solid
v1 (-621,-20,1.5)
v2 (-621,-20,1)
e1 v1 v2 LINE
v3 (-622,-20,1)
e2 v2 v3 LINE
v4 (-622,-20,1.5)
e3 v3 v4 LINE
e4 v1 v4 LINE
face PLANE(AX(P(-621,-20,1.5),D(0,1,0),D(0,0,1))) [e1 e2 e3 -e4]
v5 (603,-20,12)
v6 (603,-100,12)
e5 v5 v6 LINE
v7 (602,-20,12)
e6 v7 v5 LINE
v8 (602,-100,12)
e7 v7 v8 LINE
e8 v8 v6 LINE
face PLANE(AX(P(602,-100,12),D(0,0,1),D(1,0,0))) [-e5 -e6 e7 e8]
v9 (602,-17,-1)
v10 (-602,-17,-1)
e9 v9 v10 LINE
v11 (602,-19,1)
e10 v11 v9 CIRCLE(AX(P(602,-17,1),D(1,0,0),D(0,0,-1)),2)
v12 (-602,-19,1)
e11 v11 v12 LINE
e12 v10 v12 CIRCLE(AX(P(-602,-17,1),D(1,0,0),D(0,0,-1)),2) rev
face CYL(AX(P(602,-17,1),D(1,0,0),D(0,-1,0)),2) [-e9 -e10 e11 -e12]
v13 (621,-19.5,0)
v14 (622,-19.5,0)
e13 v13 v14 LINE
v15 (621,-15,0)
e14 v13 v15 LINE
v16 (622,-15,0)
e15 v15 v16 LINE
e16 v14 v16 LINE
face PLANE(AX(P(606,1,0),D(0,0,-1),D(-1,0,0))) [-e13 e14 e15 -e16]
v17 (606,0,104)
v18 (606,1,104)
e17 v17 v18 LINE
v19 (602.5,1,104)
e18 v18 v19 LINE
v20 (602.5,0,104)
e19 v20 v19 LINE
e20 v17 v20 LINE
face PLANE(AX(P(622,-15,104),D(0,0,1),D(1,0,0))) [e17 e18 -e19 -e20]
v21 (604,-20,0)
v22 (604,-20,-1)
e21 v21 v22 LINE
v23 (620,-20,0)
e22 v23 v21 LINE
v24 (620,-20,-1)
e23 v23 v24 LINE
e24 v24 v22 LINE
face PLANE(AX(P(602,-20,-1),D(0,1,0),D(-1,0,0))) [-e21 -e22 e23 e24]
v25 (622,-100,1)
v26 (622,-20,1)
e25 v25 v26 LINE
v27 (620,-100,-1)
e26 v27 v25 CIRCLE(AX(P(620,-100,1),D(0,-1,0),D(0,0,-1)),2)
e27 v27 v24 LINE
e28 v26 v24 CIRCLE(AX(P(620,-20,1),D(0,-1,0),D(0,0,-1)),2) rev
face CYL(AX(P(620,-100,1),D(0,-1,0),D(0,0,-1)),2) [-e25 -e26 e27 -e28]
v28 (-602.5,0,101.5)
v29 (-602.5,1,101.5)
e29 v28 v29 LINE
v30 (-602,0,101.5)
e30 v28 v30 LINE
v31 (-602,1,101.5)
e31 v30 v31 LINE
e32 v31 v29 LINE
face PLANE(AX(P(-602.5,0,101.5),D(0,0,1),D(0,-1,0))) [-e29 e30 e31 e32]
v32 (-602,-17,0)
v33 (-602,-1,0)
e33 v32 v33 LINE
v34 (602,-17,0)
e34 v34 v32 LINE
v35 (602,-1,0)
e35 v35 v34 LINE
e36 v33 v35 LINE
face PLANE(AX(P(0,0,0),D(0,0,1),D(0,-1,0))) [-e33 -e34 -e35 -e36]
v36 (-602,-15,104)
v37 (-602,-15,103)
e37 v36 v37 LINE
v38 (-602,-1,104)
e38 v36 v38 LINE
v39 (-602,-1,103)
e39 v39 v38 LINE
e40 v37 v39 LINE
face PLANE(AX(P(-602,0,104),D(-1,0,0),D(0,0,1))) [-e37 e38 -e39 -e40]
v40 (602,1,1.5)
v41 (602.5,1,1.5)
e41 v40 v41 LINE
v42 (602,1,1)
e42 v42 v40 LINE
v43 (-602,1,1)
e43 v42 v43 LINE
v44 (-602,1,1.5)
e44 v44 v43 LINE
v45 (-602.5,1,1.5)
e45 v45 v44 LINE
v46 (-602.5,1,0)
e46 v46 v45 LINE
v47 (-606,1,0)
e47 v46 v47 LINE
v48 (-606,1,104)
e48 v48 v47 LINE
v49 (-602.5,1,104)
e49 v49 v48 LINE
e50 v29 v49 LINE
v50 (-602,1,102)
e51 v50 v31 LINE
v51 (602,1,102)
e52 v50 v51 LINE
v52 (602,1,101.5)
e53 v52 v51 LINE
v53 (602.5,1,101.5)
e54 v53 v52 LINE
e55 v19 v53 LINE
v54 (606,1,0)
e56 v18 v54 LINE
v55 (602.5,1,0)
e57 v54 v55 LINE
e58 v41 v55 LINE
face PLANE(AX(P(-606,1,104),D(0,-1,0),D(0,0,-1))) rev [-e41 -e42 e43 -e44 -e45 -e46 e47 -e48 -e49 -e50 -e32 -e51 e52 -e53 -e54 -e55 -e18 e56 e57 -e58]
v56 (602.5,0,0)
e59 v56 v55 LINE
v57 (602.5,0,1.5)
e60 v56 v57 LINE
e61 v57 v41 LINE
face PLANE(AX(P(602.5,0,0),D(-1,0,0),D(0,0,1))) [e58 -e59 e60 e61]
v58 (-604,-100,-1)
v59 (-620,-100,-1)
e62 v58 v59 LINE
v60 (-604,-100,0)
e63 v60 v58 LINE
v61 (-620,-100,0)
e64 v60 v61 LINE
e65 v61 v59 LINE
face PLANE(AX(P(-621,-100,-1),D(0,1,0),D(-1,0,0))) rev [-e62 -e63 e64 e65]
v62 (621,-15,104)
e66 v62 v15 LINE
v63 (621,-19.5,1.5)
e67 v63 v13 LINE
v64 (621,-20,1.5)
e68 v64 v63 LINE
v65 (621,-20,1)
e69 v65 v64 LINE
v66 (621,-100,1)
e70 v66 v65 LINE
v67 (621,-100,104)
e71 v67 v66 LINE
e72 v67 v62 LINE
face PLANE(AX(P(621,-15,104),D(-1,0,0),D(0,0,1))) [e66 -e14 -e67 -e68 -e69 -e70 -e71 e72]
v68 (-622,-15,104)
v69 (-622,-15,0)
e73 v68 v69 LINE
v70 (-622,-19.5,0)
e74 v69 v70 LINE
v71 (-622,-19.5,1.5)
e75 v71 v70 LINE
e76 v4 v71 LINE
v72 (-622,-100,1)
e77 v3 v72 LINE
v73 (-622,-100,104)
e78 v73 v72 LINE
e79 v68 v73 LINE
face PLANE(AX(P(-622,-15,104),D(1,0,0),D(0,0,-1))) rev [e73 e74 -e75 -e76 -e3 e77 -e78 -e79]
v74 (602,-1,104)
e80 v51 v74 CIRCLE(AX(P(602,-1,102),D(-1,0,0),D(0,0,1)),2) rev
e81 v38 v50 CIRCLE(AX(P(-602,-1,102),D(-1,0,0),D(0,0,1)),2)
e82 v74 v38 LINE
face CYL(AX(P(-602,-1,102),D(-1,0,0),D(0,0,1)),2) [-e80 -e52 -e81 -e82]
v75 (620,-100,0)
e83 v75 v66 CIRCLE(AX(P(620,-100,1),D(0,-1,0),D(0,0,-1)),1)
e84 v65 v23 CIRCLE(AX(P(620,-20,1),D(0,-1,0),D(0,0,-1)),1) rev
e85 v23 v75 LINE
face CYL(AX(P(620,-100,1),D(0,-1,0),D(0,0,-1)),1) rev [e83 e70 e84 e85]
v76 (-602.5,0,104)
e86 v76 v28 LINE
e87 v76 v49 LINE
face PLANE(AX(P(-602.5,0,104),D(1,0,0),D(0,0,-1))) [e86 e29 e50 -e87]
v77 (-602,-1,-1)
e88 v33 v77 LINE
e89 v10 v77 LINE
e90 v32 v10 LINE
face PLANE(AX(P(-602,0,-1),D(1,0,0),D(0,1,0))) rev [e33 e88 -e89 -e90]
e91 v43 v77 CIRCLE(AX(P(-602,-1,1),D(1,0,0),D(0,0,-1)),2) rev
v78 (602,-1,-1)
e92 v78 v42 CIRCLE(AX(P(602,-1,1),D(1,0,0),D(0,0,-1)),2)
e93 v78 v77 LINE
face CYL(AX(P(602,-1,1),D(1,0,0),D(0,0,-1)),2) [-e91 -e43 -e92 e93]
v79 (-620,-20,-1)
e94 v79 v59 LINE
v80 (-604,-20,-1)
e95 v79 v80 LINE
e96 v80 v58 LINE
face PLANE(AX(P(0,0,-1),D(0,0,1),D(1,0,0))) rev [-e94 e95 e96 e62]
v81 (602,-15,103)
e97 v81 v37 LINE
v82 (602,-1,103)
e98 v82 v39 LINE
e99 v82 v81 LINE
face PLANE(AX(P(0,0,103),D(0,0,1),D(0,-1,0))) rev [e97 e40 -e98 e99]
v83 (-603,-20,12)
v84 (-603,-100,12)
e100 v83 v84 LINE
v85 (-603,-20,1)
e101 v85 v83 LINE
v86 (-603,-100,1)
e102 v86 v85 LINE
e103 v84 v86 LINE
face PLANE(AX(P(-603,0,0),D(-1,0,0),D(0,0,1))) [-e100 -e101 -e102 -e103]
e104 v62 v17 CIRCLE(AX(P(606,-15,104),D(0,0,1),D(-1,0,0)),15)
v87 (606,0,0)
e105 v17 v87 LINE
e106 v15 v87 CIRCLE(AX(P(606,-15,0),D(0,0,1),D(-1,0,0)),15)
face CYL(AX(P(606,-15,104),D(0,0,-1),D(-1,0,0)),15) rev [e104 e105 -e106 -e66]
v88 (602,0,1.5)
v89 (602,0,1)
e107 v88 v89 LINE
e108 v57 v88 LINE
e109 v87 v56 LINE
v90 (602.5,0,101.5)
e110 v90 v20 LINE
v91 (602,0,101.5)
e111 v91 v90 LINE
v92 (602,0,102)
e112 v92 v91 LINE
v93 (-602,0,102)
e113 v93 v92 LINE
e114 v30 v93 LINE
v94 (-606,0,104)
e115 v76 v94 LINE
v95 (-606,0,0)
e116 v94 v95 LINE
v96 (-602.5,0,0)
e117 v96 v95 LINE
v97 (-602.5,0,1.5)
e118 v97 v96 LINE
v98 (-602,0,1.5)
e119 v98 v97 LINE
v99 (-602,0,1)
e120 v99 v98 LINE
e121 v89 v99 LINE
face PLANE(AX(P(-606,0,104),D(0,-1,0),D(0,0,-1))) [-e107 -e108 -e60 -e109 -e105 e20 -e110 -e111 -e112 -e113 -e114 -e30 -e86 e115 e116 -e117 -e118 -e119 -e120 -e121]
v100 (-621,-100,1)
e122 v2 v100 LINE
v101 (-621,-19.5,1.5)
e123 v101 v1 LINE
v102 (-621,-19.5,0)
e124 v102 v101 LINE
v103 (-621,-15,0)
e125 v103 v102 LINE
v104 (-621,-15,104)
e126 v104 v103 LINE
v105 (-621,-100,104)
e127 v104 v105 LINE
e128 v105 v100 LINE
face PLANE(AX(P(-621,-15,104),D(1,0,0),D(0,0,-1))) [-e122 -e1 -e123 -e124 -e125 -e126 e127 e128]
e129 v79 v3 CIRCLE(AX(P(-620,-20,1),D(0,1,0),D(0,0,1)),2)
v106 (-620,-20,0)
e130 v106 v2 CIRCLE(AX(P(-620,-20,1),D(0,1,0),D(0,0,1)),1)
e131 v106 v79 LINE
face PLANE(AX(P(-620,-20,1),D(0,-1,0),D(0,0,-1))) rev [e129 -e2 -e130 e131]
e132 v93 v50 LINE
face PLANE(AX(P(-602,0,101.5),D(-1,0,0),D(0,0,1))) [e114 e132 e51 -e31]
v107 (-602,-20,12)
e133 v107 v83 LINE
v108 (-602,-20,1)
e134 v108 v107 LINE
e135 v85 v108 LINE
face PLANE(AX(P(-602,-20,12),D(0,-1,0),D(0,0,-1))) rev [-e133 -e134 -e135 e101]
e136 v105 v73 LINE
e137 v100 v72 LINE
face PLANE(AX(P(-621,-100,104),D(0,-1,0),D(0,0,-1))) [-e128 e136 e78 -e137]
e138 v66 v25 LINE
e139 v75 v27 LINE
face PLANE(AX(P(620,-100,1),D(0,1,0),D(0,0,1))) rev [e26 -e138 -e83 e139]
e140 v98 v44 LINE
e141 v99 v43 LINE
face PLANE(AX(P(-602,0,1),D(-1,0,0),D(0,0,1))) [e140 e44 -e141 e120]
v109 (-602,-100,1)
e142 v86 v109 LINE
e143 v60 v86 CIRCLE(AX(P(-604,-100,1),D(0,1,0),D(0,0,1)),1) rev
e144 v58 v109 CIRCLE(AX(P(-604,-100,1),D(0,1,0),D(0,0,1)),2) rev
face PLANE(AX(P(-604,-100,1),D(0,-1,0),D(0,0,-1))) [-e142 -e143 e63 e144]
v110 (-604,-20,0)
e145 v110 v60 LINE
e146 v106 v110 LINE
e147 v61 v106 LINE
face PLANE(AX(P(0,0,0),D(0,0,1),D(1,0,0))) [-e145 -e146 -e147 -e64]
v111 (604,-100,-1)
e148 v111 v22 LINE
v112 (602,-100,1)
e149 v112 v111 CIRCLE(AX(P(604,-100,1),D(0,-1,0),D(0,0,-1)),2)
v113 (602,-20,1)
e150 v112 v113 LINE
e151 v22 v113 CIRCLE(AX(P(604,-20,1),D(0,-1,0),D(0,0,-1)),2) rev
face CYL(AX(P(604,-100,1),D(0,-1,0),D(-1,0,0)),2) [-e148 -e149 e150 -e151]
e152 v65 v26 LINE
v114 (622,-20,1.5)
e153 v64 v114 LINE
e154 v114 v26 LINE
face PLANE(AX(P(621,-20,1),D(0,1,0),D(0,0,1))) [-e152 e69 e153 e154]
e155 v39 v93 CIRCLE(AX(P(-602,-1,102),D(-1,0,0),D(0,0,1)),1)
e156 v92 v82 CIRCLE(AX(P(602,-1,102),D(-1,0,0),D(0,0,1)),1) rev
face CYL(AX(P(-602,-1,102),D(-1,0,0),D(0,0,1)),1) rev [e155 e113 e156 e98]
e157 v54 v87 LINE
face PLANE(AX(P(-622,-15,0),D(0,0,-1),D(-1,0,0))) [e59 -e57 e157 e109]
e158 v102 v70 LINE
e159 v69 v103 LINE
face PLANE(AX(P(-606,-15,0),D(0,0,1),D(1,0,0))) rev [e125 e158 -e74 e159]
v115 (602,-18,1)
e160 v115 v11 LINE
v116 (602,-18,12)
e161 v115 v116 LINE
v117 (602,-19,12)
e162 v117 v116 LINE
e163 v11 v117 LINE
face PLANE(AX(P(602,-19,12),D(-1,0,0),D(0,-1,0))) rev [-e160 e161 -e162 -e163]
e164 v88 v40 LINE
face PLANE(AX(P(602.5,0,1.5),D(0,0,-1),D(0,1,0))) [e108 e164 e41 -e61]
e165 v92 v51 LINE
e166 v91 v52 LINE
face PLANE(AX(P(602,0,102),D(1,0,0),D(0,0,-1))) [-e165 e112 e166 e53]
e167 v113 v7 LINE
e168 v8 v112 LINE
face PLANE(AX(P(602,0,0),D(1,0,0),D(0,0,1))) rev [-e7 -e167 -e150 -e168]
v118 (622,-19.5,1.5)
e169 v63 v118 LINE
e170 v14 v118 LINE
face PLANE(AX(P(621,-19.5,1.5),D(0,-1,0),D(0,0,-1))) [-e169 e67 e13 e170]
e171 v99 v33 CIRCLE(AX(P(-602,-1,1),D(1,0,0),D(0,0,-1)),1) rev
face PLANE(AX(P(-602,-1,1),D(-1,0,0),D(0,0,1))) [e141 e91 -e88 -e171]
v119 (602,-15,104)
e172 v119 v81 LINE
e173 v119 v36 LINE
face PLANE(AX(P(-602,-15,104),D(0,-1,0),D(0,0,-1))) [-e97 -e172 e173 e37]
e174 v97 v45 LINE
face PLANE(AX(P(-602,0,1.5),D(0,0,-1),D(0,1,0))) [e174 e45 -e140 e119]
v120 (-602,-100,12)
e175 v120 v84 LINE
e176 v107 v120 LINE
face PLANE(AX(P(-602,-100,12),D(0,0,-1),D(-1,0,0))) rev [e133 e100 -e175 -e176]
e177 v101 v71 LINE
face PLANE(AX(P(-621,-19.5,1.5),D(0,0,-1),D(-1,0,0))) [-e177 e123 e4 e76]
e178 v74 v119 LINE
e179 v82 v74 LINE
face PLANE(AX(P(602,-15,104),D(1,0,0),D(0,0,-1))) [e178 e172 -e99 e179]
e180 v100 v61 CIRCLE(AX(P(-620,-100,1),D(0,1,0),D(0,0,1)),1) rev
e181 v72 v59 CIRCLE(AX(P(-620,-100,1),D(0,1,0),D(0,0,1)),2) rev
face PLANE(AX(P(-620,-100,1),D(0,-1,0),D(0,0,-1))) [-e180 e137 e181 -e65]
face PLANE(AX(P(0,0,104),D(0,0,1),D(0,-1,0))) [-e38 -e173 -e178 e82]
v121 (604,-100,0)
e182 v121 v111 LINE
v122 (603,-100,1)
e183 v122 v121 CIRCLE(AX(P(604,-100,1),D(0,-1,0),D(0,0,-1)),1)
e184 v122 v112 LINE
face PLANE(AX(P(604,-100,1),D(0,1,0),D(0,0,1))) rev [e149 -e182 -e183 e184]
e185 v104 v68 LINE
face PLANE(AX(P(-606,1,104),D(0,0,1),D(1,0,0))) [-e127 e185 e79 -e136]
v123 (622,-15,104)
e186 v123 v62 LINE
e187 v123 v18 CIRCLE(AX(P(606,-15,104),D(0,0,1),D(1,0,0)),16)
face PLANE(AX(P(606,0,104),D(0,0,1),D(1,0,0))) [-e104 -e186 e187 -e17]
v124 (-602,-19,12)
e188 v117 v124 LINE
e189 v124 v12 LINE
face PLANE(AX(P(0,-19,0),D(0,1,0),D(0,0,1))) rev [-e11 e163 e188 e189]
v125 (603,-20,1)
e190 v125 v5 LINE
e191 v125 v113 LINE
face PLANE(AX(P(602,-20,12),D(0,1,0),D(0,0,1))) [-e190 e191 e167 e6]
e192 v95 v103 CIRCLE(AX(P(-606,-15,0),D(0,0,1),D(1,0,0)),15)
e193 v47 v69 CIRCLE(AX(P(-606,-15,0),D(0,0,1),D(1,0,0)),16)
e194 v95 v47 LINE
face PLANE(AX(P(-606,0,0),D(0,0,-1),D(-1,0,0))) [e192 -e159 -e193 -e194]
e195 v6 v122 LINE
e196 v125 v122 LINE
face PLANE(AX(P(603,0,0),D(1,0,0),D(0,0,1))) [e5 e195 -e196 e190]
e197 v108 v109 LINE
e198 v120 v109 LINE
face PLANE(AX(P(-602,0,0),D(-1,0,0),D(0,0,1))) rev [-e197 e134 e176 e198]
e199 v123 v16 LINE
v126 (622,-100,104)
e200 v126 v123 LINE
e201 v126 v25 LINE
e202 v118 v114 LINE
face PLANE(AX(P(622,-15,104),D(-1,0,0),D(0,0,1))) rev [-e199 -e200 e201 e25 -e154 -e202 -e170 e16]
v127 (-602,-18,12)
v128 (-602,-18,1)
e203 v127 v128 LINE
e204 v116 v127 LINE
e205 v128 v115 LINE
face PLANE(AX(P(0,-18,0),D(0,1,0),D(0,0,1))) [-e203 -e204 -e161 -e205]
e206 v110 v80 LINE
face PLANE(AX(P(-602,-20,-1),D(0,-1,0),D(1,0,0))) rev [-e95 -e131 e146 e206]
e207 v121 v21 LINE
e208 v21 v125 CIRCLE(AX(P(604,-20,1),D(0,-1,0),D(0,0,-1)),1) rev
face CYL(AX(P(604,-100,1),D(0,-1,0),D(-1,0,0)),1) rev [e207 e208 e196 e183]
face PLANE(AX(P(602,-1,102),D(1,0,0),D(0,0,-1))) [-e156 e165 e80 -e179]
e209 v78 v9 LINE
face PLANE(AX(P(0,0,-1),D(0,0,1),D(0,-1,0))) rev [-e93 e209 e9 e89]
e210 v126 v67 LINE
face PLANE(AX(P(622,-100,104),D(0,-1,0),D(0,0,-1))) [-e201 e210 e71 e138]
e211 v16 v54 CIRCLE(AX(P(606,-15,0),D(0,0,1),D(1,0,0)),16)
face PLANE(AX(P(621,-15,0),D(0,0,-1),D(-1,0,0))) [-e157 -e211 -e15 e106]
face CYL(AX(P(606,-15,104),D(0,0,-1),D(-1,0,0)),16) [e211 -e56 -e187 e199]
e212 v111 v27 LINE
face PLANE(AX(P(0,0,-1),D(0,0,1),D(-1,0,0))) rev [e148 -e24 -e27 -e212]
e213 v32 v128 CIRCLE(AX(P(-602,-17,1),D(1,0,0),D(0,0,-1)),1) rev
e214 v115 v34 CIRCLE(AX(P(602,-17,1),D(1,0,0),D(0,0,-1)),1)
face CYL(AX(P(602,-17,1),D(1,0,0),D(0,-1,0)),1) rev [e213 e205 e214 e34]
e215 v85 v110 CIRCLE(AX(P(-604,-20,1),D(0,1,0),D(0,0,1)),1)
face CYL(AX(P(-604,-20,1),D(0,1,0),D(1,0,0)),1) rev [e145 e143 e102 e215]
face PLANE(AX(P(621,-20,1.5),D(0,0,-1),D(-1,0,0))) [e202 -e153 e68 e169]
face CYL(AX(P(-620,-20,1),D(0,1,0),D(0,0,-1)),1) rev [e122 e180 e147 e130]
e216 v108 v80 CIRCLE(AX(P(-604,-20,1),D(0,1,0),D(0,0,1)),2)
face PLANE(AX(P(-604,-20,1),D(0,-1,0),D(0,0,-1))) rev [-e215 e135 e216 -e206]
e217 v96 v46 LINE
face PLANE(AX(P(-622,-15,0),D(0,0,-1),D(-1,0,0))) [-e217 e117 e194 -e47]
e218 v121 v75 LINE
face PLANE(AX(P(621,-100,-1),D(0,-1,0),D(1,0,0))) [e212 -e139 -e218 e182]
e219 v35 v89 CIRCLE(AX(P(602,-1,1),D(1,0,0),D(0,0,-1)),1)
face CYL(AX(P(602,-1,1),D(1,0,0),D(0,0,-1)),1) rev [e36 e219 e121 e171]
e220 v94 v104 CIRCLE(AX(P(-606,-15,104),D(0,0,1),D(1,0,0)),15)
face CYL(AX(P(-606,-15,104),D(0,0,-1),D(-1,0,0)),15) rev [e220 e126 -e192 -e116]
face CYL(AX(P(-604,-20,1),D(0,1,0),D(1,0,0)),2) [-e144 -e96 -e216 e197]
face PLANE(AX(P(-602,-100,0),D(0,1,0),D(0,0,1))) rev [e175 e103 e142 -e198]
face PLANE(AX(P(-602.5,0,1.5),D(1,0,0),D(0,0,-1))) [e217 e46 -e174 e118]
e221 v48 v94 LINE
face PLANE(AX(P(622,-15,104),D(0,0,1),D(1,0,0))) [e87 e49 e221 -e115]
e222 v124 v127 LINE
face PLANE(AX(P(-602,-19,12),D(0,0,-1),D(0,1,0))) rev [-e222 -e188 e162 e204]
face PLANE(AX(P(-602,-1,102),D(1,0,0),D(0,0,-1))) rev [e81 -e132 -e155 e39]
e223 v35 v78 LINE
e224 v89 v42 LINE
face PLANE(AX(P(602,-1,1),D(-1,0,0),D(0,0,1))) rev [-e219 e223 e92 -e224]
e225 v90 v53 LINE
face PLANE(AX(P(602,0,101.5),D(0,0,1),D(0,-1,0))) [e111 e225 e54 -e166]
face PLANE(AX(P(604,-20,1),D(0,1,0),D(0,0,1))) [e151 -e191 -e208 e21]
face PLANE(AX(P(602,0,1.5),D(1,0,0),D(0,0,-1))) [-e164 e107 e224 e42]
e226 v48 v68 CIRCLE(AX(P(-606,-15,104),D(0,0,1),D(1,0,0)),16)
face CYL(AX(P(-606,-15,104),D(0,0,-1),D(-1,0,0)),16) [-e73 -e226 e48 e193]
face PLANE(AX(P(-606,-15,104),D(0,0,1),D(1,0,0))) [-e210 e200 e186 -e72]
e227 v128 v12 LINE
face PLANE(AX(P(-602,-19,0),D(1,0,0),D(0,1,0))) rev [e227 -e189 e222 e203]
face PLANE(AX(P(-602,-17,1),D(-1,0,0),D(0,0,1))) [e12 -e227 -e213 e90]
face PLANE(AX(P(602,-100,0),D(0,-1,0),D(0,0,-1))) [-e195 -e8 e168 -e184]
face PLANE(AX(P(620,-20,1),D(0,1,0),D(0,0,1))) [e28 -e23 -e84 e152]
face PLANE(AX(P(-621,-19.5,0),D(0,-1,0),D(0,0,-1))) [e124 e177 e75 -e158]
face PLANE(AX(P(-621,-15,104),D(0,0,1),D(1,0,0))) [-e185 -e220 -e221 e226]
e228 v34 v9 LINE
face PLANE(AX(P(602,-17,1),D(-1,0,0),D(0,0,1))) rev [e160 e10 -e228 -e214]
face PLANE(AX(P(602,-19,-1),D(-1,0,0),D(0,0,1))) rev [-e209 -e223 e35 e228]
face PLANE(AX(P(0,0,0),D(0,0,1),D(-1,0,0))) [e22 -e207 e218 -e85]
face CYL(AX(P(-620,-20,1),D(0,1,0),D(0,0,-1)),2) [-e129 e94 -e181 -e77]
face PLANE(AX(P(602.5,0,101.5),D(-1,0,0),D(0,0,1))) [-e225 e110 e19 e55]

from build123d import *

# Parameters (mm, degrees)
BASE_FLANGE1_DEPTH            = 104
EDGE_FLANGE1_STRIP_W          = 6
EDGE_FLANGE1_STRIP_H          = 1
EDGE_FLANGE1_STRIP_CUT_DEPTH  = 1204
EDGE_FLANGE1_RELIEF_W         = 6.5
EDGE_FLANGE1_RELIEF_H         = 0.5
EDGE_FLANGE1_RELIEF_CUT_DEPTH = 1
EDGE_FLANGE1_DEPTH            = 1204
EDGE_FLANGE2_STRIP_W          = 6
EDGE_FLANGE2_STRIP_H          = 1
EDGE_FLANGE2_STRIP_CUT_DEPTH  = 1204
EDGE_FLANGE2_DEPTH            = 1204
EDGE_FLANGE3_STRIP_W          = 6
EDGE_FLANGE3_STRIP_H          = 1
EDGE_FLANGE3_STRIP_CUT_DEPTH  = 80
EDGE_FLANGE3_RELIEF_W         = 6.5
EDGE_FLANGE3_RELIEF_H         = 0.5
EDGE_FLANGE3_RELIEF_CUT_DEPTH = 1
EDGE_FLANGE3_DEPTH            = 80
EDGE_FLANGE4_STRIP_W          = 6
EDGE_FLANGE4_STRIP_H          = 1
EDGE_FLANGE4_STRIP_CUT_DEPTH  = 80
EDGE_FLANGE4_DEPTH            = 80
EDGE_FLANGE5_STRIP_W          = 6
EDGE_FLANGE5_STRIP_H          = 1
EDGE_FLANGE5_STRIP_CUT_DEPTH  = 1204
EDGE_FLANGE5_RELIEF_W         = 6.5
EDGE_FLANGE5_RELIEF_H         = 0.5
EDGE_FLANGE5_RELIEF_CUT_DEPTH = 1
EDGE_FLANGE5_DEPTH            = 1204


# Sheet-metal steps are written as plain solids
with BuildPart() as part:
    # Sketch1 → Base-Flange1 (new body)
    with BuildSketch(Plane.XY):
        with BuildLine():
            Line((-621, -100), (-621, -15))
            ThreePointArc((-621, -15), (-616.606601718, -4.393398282), (-606, 0))
            Line((-606, 0), (606, 0))
            ThreePointArc((606, 0), (616.606601718, -4.393398282), (621, -15))
            Line((621, -15), (621, -100))
            Line((621, -100), (622, -100))
            Line((622, -100), (622, -15))
            ThreePointArc((622, -15), (617.313708499, -3.686291501), (606, 1))
            Line((606, 1), (-606, 1))
            ThreePointArc((-606, 1), (-617.313708499, -3.686291501), (-622, -15))
            Line((-622, -15), (-622, -100))
            Line((-622, -100), (-621, -100))
        make_face()
    extrude(amount=BASE_FLANGE1_DEPTH)

    # Edge-Flange1 strip (across the edge) → Edge-Flange1 strip cut (cut)
    with BuildSketch(Plane(origin=(-602, 0, 0), x_dir=(0, 0, 1), z_dir=(1, 0, 0))):
        with Locations((-2, -0.5)):
            Rectangle(EDGE_FLANGE1_STRIP_W, EDGE_FLANGE1_STRIP_H)
    extrude(amount=EDGE_FLANGE1_STRIP_CUT_DEPTH, mode=Mode.SUBTRACT)

    # Edge-Flange1 relief (on the sheet) → Edge-Flange1 relief cut (cut)
    with BuildSketch(Plane(origin=(-602, 0, 1), x_dir=(0, 0, 1), z_dir=(0, -1, 0))):
        with Locations((-2.75, 0.25)):
            Rectangle(EDGE_FLANGE1_RELIEF_W, EDGE_FLANGE1_RELIEF_H)
        with Locations((-2.75, -1204.25)):
            Rectangle(EDGE_FLANGE1_RELIEF_W, EDGE_FLANGE1_RELIEF_H)
    extrude(amount=-EDGE_FLANGE1_RELIEF_CUT_DEPTH, mode=Mode.SUBTRACT)

    # Edge-Flange1 section (across the edge) → Edge-Flange1 (add)
    with BuildSketch(Plane(origin=(-602, 0, 0), x_dir=(0, 0, 1), z_dir=(1, 0, 0))):
        with BuildLine():
            Line((-1, 1), (-1, 19))
            Line((-1, 19), (0, 19))
            Line((0, 19), (0, 1))
            ThreePointArc((0, 1), (0.292893219, 0.292893219), (1, 0))
            Line((1, 0), (1, -1))
            ThreePointArc((1, -1), (-0.414213562, -0.414213562), (-1, 1))
        make_face()
    extrude(amount=EDGE_FLANGE1_DEPTH)

    # Edge-Flange2 strip (across the edge) → Edge-Flange2 strip cut (cut)
    with BuildSketch(Plane(origin=(-602, -19, 0), x_dir=(0, 1, 0), z_dir=(1, 0, 0))):
        with Locations((-1, -0.5)):
            Rectangle(EDGE_FLANGE2_STRIP_W, EDGE_FLANGE2_STRIP_H)
    extrude(amount=EDGE_FLANGE2_STRIP_CUT_DEPTH, mode=Mode.SUBTRACT)

    # Edge-Flange2 section (across the edge) → Edge-Flange2 (add)
    with BuildSketch(Plane(origin=(-602, -19, 0), x_dir=(0, 1, 0), z_dir=(1, 0, 0))):
        with BuildLine():
            Line((0, 1), (0, 12))
            Line((0, 12), (1, 12))
            Line((1, 12), (1, 1))
            ThreePointArc((1, 1), (1.292893219, 0.292893219), (2, 0))
            Line((2, 0), (2, -1))
            ThreePointArc((2, -1), (0.585786438, -0.414213562), (0, 1))
        make_face()
    extrude(amount=EDGE_FLANGE2_DEPTH)

    # Edge-Flange3 strip (across the edge) → Edge-Flange3 strip cut (cut)
    with BuildSketch(Plane(origin=(-621, -100, 0), x_dir=(0, 0, 1), z_dir=(0, 1, 0))):
        with Locations((-2, -0.5)):
            Rectangle(EDGE_FLANGE3_STRIP_W, EDGE_FLANGE3_STRIP_H)
    edge_flange3_strip_cut = extrude(amount=EDGE_FLANGE3_STRIP_CUT_DEPTH, mode=Mode.SUBTRACT)

    # Edge-Flange3 relief (on the sheet) → Edge-Flange3 relief cut (cut)
    with BuildSketch(Plane(origin=(-621, -100, 1), x_dir=(0, 0, 1), z_dir=(1, 0, 0))):
        with Locations((-2.75, -80.25)):
            Rectangle(EDGE_FLANGE3_RELIEF_W, EDGE_FLANGE3_RELIEF_H)
    edge_flange3_relief_cut = extrude(amount=-EDGE_FLANGE3_RELIEF_CUT_DEPTH, mode=Mode.SUBTRACT)

    # Edge-Flange3 section (across the edge) → Edge-Flange3 (add)
    with BuildSketch(Plane(origin=(-621, -100, 0), x_dir=(0, 0, 1), z_dir=(0, 1, 0))):
        with BuildLine():
            Line((-1, 1), (-1, 19))
            Line((-1, 19), (0, 19))
            Line((0, 19), (0, 1))
            ThreePointArc((0, 1), (0.292893219, 0.292893219), (1, 0))
            Line((1, 0), (1, -1))
            ThreePointArc((1, -1), (-0.414213562, -0.414213562), (-1, 1))
        make_face()
    edge_flange3 = extrude(amount=EDGE_FLANGE3_DEPTH)

    # Edge-Flange4 strip (across the edge) → Edge-Flange4 strip cut (cut)
    with BuildSketch(Plane(origin=(-602, -100, 0), x_dir=(-1, 0, 0), z_dir=(0, 1, 0))):
        with Locations((-1, -0.5)):
            Rectangle(EDGE_FLANGE4_STRIP_W, EDGE_FLANGE4_STRIP_H)
    edge_flange4_strip_cut = extrude(amount=EDGE_FLANGE4_STRIP_CUT_DEPTH, mode=Mode.SUBTRACT)

    # Edge-Flange4 section (across the edge) → Edge-Flange4 (add)
    with BuildSketch(Plane(origin=(-602, -100, 0), x_dir=(-1, 0, 0), z_dir=(0, 1, 0))):
        with BuildLine():
            Line((0, 1), (0, 12))
            Line((0, 12), (1, 12))
            Line((1, 12), (1, 1))
            ThreePointArc((1, 1), (1.292893219, 0.292893219), (2, 0))
            Line((2, 0), (2, -1))
            ThreePointArc((2, -1), (0.585786438, -0.414213562), (0, 1))
        make_face()
    edge_flange4 = extrude(amount=EDGE_FLANGE4_DEPTH)

    # Mirror1: Edge-Flange3 strip cut, Edge-Flange3 relief cut, Edge-Flange3, Edge-Flange4 strip cut, Edge-Flange4 across plane
    add(edge_flange3_strip_cut.mirror(Plane(origin=(0, 0, 0), x_dir=(0, 0, 1), z_dir=(1, 0, 0))), mode=Mode.SUBTRACT)
    add(edge_flange3_relief_cut.mirror(Plane(origin=(0, 0, 0), x_dir=(0, 0, 1), z_dir=(1, 0, 0))), mode=Mode.SUBTRACT)
    add(edge_flange3.mirror(Plane(origin=(0, 0, 0), x_dir=(0, 0, 1), z_dir=(1, 0, 0))))
    add(edge_flange4_strip_cut.mirror(Plane(origin=(0, 0, 0), x_dir=(0, 0, 1), z_dir=(1, 0, 0))), mode=Mode.SUBTRACT)
    add(edge_flange4.mirror(Plane(origin=(0, 0, 0), x_dir=(0, 0, 1), z_dir=(1, 0, 0))))

    # Edge-Flange5 strip (across the edge) → Edge-Flange5 strip cut (cut)
    with BuildSketch(Plane(origin=(602, 0, 104), x_dir=(0, 0, -1), z_dir=(-1, 0, 0))):
        with Locations((-1, -0.5)):
            Rectangle(EDGE_FLANGE5_STRIP_W, EDGE_FLANGE5_STRIP_H)
    extrude(amount=EDGE_FLANGE5_STRIP_CUT_DEPTH, mode=Mode.SUBTRACT)

    # Edge-Flange5 relief (on the sheet) → Edge-Flange5 relief cut (cut)
    with BuildSketch(Plane(origin=(602, 0, 102), x_dir=(0, 0, -1), z_dir=(0, -1, 0))):
        with Locations((-2.75, 0.25)):
            Rectangle(EDGE_FLANGE5_RELIEF_W, EDGE_FLANGE5_RELIEF_H)
        with Locations((-2.75, -1204.25)):
            Rectangle(EDGE_FLANGE5_RELIEF_W, EDGE_FLANGE5_RELIEF_H)
    extrude(amount=-EDGE_FLANGE5_RELIEF_CUT_DEPTH, mode=Mode.SUBTRACT)

    # Edge-Flange5 section (across the edge) → Edge-Flange5 (add)
    with BuildSketch(Plane(origin=(602, 0, 104), x_dir=(0, 0, -1), z_dir=(-1, 0, 0))):
        with BuildLine():
            Line((0, 1), (0, 15))
            Line((0, 15), (1, 15))
            Line((1, 15), (1, 1))
            ThreePointArc((1, 1), (1.292893219, 0.292893219), (2, 0))
            Line((2, 0), (2, -1))
            ThreePointArc((2, -1), (0.585786438, -0.414213562), (0, 1))
        make_face()
    extrude(amount=EDGE_FLANGE5_DEPTH)


solid = part.part
